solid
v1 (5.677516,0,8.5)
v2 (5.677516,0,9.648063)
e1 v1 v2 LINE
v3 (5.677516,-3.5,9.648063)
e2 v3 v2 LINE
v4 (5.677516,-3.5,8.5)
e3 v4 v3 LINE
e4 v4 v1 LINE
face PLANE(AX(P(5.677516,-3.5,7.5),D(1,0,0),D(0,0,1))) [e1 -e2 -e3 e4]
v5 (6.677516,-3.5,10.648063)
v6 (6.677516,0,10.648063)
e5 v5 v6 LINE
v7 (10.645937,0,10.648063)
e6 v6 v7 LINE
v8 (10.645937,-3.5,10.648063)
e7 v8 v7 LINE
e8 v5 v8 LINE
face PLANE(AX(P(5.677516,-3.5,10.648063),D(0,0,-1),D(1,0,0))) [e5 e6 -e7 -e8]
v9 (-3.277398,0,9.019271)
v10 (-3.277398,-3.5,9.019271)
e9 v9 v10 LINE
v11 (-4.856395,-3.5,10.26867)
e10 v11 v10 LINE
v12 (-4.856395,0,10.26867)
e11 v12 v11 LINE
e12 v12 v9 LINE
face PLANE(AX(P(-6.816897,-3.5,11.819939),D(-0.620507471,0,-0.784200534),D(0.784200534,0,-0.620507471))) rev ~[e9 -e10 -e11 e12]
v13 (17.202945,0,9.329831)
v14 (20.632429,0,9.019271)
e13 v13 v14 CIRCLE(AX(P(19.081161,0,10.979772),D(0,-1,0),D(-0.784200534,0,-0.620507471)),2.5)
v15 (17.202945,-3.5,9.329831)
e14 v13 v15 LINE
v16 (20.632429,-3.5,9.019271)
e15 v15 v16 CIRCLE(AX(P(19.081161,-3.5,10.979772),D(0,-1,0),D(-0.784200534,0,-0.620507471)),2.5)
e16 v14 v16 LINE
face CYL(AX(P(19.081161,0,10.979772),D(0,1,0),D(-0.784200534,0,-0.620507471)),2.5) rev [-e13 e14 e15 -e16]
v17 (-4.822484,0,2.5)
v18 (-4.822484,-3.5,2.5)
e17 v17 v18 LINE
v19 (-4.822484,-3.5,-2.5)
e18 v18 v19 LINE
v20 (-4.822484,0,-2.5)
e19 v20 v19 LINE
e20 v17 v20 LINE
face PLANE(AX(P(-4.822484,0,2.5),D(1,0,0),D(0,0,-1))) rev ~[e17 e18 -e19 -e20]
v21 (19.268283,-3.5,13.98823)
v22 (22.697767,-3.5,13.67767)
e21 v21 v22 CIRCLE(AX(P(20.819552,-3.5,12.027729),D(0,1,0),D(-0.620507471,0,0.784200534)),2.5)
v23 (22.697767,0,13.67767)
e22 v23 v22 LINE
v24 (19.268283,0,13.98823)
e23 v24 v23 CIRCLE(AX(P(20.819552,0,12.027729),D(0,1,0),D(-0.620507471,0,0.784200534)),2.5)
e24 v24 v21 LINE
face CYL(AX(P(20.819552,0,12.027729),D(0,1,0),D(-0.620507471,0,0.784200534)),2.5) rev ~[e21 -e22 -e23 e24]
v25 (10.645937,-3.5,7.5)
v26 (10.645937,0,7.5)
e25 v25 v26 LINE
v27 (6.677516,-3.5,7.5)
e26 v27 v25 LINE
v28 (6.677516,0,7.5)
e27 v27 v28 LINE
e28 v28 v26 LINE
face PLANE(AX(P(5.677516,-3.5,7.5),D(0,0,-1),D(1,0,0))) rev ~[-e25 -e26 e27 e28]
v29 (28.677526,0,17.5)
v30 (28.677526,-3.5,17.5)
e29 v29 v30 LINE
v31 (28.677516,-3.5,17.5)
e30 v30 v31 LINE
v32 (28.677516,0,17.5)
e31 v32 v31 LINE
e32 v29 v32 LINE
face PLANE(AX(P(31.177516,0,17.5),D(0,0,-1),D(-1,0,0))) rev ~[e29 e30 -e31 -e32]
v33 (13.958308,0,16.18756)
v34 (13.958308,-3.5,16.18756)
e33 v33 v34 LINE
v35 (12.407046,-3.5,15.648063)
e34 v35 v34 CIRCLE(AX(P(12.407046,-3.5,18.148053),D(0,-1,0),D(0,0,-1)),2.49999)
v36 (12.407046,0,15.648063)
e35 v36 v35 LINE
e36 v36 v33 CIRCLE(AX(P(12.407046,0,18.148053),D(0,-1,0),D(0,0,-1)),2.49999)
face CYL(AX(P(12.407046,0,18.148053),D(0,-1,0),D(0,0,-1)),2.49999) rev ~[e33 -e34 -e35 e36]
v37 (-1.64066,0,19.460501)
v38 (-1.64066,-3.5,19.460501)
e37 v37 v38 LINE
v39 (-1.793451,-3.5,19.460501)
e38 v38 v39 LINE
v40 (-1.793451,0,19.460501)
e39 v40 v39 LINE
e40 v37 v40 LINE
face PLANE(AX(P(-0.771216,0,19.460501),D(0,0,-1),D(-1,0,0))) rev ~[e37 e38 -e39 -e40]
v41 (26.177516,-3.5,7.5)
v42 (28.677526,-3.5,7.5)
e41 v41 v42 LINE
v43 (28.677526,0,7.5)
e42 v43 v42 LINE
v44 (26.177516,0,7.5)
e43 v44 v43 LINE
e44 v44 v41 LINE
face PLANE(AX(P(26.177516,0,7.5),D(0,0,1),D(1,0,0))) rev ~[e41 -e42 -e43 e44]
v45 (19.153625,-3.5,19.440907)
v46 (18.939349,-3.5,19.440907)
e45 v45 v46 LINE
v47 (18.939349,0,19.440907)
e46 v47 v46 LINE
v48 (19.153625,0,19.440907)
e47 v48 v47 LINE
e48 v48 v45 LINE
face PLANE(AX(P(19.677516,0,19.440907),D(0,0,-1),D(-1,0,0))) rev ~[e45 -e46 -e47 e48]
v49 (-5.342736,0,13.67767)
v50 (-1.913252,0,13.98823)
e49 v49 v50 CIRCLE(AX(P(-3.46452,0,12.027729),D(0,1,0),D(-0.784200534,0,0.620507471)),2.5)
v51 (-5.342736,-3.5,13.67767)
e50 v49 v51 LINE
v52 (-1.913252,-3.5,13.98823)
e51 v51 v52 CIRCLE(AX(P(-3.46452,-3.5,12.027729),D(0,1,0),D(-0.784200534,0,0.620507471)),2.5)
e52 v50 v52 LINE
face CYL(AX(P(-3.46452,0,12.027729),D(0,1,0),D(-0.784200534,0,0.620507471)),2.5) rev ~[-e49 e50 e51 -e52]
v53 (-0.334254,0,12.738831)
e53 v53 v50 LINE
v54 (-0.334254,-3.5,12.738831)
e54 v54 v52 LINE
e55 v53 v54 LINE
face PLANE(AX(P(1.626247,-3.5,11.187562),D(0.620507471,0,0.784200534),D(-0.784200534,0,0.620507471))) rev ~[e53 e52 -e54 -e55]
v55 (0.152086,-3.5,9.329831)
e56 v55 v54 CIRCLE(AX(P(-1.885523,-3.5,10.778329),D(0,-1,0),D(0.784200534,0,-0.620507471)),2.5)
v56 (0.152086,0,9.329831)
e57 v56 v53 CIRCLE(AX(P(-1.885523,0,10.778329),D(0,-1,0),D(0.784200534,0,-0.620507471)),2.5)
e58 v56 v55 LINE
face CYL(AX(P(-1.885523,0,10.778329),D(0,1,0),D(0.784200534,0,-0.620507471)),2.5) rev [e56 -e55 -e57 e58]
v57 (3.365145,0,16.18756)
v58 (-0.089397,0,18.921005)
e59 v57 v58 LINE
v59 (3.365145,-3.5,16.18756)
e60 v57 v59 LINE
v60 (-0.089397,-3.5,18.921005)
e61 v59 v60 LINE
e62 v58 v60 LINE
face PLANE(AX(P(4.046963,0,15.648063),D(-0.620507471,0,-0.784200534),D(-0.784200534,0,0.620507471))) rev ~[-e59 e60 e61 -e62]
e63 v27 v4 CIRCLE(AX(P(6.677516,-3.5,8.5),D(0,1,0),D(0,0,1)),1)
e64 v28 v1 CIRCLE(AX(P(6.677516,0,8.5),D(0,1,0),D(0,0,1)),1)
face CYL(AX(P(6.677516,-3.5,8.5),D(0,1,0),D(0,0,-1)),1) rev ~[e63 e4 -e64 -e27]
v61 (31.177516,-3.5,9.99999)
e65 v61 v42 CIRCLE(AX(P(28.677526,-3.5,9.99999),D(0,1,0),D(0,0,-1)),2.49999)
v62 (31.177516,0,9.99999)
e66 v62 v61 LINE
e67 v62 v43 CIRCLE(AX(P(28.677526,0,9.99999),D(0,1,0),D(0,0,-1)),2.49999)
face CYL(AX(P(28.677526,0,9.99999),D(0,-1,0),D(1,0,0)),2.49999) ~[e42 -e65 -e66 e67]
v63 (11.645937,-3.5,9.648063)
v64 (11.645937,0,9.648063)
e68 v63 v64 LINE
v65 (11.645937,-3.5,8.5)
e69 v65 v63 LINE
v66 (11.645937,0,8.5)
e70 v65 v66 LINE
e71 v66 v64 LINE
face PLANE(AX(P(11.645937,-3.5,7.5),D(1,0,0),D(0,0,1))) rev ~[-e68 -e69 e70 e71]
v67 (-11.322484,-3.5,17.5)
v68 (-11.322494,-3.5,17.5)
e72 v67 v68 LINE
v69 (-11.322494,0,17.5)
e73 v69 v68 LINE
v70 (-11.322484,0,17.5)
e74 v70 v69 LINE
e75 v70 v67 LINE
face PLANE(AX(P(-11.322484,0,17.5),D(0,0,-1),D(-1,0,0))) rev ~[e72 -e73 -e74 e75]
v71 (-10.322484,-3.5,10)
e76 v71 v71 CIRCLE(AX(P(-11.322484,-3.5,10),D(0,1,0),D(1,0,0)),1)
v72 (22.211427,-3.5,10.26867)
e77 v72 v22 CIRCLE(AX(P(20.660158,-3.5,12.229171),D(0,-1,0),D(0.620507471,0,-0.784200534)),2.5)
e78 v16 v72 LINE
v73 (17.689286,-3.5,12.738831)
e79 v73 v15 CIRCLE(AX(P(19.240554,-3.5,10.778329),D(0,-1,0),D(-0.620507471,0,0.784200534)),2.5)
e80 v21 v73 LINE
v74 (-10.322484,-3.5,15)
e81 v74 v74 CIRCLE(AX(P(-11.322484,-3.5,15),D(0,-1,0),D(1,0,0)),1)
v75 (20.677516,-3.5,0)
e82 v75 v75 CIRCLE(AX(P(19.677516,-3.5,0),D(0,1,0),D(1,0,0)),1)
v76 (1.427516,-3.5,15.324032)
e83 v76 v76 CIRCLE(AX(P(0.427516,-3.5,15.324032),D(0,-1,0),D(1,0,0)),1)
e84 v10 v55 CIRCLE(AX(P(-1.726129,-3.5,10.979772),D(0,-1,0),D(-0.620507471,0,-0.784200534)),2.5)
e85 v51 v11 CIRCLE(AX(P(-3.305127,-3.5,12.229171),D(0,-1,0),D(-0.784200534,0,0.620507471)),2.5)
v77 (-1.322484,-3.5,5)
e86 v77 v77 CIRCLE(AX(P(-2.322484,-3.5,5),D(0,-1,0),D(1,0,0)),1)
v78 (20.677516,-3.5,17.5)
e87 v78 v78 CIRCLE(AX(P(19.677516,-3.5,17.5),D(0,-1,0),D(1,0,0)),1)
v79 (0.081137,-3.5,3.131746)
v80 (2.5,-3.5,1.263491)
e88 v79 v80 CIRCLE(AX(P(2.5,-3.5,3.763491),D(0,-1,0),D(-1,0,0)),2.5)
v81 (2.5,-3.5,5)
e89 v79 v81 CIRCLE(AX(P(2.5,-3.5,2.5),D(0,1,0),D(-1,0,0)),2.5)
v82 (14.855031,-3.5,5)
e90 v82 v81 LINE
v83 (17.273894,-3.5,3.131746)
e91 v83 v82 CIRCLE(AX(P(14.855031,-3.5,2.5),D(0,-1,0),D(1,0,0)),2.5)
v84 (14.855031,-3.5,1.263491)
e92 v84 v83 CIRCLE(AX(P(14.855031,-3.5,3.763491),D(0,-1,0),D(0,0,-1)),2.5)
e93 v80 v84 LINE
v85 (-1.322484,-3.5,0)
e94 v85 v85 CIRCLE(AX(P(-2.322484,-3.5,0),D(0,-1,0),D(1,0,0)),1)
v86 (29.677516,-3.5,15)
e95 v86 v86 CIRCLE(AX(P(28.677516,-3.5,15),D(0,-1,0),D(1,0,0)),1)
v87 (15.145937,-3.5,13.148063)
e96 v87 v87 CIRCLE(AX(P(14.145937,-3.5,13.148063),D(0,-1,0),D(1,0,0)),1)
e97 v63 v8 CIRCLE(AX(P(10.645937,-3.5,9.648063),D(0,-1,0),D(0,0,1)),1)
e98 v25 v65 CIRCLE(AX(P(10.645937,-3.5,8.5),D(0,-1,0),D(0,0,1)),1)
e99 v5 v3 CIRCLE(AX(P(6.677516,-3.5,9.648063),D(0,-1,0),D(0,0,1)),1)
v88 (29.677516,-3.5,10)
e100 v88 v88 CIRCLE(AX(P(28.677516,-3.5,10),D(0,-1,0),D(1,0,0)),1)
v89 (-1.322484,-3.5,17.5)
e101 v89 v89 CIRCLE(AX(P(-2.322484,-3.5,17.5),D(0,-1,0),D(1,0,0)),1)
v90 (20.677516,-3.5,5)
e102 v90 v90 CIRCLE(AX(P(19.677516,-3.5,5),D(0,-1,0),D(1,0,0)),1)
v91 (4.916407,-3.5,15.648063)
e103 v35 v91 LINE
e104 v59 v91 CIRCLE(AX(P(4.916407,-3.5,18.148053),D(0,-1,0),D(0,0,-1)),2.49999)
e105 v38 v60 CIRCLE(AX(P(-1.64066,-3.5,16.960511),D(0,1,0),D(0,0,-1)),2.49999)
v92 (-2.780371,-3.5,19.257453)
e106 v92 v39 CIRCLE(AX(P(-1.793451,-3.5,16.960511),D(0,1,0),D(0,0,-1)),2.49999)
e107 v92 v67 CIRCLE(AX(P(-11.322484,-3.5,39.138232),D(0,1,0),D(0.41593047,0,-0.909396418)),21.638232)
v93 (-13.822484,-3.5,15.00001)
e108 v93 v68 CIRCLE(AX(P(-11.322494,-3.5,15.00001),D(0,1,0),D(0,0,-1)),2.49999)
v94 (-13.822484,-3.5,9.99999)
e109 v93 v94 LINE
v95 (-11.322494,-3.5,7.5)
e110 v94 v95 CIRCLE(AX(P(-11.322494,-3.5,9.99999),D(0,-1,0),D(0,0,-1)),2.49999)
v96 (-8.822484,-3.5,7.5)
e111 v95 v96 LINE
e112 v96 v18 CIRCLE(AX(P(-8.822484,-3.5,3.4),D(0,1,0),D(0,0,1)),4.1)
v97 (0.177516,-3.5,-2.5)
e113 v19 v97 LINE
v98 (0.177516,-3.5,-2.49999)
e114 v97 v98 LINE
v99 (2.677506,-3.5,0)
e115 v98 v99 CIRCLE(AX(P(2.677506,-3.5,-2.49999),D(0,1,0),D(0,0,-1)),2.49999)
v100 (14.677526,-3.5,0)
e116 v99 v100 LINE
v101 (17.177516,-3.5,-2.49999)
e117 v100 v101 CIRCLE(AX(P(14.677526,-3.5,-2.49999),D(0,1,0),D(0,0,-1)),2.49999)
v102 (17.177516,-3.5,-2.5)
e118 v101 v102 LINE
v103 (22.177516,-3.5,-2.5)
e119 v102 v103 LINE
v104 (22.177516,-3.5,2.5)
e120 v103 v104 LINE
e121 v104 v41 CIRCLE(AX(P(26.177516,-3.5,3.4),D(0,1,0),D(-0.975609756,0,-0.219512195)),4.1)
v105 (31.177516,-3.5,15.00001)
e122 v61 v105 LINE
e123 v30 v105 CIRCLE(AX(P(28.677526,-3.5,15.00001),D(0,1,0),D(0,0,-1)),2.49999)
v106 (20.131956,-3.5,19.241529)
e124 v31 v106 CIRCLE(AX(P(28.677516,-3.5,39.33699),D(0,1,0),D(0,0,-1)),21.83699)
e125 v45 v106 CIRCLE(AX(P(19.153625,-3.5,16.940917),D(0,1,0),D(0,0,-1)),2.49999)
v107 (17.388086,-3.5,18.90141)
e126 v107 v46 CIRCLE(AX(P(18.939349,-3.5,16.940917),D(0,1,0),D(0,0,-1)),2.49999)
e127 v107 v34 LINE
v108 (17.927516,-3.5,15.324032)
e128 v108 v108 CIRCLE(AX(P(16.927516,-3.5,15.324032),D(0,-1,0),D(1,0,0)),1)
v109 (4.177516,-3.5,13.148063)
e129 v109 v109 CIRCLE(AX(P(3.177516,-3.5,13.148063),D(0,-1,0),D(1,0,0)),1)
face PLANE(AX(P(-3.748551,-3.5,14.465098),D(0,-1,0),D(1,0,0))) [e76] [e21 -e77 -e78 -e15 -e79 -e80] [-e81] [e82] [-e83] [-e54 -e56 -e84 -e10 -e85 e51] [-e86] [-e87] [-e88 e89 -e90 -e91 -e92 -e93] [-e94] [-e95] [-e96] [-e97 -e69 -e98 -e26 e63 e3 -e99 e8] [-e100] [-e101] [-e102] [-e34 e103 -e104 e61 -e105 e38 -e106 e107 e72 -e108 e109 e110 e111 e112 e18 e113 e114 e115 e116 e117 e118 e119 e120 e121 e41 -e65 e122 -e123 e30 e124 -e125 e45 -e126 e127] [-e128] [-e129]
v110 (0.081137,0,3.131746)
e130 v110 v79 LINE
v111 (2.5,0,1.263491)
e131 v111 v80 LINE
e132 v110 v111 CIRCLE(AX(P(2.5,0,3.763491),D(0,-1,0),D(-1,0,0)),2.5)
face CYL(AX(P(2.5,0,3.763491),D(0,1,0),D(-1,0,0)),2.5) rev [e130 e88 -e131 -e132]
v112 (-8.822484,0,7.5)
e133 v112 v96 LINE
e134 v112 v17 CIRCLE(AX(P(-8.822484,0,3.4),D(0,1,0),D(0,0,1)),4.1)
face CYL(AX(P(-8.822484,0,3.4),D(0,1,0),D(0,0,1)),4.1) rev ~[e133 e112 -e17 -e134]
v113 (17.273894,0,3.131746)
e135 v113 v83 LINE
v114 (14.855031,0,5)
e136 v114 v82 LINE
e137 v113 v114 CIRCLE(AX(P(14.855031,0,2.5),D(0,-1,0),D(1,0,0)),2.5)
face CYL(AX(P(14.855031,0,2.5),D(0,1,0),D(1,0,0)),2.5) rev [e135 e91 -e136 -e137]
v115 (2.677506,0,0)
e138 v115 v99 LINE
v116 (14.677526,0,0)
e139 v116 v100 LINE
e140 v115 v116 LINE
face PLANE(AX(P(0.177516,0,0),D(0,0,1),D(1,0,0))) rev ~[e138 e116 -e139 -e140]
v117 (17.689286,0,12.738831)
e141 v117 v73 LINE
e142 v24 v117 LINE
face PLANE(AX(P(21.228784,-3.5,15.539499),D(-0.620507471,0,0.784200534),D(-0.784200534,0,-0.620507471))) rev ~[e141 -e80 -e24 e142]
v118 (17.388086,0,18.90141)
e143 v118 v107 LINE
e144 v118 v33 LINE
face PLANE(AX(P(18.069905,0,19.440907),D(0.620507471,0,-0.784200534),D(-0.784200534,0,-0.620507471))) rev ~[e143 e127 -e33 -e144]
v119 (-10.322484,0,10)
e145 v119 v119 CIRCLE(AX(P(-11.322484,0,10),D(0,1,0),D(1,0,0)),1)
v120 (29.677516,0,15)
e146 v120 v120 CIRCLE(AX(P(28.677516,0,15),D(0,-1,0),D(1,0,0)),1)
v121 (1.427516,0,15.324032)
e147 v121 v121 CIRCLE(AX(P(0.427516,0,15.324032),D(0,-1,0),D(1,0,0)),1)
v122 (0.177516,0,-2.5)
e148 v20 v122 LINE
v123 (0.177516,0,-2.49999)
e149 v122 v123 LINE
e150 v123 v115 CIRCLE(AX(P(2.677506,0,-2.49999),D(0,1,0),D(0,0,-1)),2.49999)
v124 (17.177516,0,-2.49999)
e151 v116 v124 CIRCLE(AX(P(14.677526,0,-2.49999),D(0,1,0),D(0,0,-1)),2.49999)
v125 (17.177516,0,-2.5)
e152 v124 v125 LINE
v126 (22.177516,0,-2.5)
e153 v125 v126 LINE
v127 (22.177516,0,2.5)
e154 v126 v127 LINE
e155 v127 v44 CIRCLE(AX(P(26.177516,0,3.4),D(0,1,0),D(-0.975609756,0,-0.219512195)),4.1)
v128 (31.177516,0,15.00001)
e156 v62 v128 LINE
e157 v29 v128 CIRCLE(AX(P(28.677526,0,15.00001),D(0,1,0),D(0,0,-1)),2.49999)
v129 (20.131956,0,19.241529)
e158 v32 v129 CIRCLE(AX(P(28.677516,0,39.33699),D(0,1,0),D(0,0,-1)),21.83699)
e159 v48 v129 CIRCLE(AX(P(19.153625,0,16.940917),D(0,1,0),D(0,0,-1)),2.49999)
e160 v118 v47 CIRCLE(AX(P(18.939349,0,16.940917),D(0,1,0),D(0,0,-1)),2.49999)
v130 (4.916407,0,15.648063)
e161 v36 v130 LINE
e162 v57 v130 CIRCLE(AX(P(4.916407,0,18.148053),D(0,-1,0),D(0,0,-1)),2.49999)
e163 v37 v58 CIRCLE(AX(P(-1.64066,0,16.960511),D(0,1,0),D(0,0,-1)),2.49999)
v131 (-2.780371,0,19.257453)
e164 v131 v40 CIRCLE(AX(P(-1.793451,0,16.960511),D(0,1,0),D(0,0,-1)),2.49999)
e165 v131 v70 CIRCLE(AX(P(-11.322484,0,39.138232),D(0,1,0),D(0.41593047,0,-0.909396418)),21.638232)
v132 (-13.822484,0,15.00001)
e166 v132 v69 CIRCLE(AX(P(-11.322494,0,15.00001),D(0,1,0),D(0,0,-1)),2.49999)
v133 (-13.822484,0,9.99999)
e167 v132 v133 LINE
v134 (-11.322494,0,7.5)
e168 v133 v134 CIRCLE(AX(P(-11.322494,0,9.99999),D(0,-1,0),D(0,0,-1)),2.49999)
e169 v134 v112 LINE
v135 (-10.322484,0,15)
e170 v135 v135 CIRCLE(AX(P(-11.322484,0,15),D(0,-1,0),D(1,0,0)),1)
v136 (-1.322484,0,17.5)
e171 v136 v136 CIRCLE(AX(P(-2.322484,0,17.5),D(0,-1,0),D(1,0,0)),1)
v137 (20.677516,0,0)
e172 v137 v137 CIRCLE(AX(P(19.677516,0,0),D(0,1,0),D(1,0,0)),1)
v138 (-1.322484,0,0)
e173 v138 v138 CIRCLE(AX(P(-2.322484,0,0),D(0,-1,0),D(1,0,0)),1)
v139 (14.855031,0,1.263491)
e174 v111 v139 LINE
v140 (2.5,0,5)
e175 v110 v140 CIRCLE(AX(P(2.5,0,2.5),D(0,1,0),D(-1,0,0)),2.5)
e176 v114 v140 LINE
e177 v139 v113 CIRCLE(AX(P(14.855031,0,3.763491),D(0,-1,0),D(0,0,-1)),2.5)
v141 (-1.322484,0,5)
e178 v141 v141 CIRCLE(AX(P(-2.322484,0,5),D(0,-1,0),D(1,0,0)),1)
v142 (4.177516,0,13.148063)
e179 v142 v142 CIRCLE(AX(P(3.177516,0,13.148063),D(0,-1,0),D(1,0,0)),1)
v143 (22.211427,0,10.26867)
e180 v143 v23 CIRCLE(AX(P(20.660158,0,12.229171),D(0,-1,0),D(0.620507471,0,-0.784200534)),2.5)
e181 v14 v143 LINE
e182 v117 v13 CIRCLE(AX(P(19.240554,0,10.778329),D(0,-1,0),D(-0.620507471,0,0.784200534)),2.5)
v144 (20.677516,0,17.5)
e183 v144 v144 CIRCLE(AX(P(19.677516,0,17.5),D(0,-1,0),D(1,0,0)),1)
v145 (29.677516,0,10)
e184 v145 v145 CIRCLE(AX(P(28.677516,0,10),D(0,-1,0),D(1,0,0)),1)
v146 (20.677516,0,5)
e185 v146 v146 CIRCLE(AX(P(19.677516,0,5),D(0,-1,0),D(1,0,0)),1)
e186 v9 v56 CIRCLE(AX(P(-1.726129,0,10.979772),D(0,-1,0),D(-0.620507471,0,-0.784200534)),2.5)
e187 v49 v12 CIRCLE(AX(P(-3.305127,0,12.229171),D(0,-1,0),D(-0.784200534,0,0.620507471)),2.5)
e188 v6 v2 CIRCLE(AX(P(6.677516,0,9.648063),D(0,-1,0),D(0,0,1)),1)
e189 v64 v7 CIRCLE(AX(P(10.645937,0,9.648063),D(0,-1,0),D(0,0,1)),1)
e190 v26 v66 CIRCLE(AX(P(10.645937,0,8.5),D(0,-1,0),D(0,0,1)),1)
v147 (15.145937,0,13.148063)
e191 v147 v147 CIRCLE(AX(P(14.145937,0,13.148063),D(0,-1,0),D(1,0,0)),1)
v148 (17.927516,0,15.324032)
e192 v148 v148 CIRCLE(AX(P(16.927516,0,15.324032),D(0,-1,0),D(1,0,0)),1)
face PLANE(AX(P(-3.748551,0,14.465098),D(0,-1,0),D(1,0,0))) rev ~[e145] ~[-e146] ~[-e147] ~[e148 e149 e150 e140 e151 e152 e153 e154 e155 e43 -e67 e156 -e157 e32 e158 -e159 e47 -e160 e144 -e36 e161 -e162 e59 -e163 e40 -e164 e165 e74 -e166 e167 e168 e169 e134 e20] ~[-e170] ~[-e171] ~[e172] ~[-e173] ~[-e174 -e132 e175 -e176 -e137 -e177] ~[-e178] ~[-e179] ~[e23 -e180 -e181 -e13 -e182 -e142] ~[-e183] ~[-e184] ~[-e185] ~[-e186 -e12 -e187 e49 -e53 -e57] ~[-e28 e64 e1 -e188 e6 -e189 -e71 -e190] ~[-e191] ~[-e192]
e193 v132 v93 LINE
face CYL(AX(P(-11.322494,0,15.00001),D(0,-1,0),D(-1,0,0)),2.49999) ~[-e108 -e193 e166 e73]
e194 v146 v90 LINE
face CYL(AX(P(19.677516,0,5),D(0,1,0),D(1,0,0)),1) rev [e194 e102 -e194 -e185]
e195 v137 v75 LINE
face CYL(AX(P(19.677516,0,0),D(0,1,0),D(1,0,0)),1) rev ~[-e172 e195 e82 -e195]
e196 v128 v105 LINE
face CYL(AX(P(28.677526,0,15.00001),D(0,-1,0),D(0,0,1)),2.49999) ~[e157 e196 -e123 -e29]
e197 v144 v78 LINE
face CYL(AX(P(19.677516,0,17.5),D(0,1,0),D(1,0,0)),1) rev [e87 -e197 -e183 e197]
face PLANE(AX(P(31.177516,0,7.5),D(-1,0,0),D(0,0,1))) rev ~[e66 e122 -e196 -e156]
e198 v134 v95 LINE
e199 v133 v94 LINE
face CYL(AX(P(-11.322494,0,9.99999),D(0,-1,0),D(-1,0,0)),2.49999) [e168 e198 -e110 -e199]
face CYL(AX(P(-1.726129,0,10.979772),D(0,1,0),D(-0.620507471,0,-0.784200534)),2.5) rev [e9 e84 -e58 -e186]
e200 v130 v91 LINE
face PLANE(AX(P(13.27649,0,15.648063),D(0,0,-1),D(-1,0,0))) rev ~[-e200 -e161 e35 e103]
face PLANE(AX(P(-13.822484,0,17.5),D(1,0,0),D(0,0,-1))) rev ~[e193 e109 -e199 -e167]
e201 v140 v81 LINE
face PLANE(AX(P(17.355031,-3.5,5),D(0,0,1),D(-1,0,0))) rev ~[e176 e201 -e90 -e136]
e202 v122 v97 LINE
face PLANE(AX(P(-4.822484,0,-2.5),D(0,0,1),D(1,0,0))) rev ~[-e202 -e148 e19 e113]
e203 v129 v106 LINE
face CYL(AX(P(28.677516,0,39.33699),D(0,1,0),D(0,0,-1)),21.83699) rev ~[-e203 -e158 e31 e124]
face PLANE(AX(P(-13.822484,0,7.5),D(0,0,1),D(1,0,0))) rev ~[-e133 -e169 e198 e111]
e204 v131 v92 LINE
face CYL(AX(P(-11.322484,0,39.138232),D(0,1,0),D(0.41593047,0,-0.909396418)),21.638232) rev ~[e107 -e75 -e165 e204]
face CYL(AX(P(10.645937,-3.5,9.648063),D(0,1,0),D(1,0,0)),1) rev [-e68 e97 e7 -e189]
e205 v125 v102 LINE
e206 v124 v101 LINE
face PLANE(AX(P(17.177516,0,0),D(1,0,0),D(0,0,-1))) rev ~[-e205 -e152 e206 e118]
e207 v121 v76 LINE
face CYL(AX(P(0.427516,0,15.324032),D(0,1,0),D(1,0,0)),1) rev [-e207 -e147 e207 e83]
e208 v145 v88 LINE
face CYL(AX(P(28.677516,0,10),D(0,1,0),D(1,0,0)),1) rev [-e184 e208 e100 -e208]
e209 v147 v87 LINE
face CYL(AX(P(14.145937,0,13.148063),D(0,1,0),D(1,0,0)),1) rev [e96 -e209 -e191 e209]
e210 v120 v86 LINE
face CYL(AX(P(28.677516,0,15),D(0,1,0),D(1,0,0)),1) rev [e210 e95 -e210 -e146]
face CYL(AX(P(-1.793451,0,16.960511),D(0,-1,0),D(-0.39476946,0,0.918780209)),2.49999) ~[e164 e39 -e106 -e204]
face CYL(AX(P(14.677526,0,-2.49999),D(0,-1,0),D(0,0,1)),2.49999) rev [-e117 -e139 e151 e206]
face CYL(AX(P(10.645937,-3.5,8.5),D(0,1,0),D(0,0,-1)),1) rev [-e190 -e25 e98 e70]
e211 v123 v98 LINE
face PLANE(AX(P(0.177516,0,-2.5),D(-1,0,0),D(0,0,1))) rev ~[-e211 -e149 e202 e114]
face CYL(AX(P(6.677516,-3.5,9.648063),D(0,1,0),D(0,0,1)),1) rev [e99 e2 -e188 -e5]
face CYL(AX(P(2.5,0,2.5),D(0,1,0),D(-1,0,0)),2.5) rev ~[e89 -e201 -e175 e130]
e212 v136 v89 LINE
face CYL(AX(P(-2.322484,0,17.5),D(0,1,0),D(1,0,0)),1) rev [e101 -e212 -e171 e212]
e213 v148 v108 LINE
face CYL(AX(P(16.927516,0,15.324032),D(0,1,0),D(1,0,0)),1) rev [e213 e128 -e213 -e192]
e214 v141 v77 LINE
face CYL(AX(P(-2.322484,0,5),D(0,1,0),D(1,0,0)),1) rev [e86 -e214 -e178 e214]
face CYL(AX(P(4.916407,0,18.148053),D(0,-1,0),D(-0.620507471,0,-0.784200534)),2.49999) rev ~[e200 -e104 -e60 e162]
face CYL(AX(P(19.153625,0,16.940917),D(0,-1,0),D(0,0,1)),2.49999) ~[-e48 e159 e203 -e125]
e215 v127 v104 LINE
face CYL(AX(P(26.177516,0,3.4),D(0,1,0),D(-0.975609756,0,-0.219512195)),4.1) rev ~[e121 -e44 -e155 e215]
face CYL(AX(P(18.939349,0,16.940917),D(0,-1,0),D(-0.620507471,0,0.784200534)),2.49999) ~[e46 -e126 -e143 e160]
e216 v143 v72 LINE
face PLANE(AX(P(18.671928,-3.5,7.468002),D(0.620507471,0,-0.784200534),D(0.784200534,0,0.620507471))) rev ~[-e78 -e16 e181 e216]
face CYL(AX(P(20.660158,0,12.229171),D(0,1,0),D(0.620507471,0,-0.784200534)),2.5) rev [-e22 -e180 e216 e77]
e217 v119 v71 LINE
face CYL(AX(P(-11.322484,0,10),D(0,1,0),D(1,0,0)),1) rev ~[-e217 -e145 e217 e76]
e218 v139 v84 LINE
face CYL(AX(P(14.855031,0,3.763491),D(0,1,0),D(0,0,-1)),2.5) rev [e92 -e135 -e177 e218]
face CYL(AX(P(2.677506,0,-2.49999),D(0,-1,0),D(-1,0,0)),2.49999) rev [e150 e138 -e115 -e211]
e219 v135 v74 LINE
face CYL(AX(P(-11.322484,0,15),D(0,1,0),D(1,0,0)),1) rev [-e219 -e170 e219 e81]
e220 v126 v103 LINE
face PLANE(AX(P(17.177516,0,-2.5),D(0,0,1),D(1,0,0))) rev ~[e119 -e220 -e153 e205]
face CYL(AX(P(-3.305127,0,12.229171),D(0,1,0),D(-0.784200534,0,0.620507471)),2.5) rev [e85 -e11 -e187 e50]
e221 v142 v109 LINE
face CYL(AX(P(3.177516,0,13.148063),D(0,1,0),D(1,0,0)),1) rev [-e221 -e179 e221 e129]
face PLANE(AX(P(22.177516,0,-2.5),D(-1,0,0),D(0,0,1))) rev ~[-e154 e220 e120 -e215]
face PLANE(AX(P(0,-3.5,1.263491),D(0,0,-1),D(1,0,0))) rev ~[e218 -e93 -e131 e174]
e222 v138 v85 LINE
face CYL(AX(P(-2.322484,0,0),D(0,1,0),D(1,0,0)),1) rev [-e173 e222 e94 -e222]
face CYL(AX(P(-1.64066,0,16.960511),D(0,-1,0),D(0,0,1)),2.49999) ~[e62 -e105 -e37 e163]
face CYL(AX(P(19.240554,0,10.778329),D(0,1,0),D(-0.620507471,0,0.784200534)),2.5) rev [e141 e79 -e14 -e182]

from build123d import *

# Parameters (mm, degrees)
F0_R        = 1
F1_DEPTH    = 3.5
F2_R        = 2.49999
F3_W        = 8.6775156483
F3_H        = 3.7365088891
F4_DEPTH    = 25.4
F5_T1_DEPTH = 3.5
F6_W        = 5.9684215951
F6_H        = 3.1480632909
F7_DEPTH    = 25.4
F8_R        = 1


# Not quite as in the source:
# - a fillet or chamfer that OpenCascade refuses, or shapes differently, is made with other operations: its cross-section is extruded or revolved along the edge and cut away or added
# - a fillet or chamfer is up to 0.001 mm smaller than in the source, because OpenCascade refuses the exact size


with BuildPart() as f1:
    # F0 (on Front) → F1 (new body)
    with BuildSketch(Plane.XZ):
        with BuildLine():
            Line((-13.8224843517, 17.5), (-13.8224843517, 10))
            Line((-13.8224843517, 10), (-13.8224843517, 7.5))
            Line((-13.8224843517, 7.5), (-8.8224843517, 7.5))
            ThreePointArc((-8.8224843517, 7.5), (-5.620922233, 5.961249695), (-4.8224843517, 2.5))
            Line((-4.8224843517, 2.5), (-4.8224843517, 0))
            Line((-4.8224843517, 0), (-4.8224843517, -2.5))
            Line((-4.8224843517, -2.5), (0.1775156483, -2.5))
            Line((0.1775156483, -2.5), (0.1775156483, 0))
            Line((0.1775156483, 0), (8.6775156483, 0))
            Line((8.6775156483, 0), (17.1775156483, 0))
            Line((17.1775156483, 0), (17.1775156483, -2.5))
            Line((17.1775156483, -2.5), (22.1775156483, -2.5))
            Line((22.1775156483, -2.5), (22.1775156483, 0))
            Line((22.1775156483, 0), (22.1775156483, 2.5))
            ThreePointArc((22.1775156483, 2.5), (22.9759535296, 5.961249695), (26.1775156483, 7.5))
            Line((26.1775156483, 7.5), (31.1775156483, 7.5))
            Line((31.1775156483, 7.5), (31.1775156483, 10))
            Line((31.1775156483, 10), (31.1775156483, 17.5))
            Line((31.1775156483, 17.5), (28.6775156483, 17.5))
            ThreePointArc((28.6775156483, 17.5), (24.0740626287, 17.9907408644), (19.6775156483, 19.4409066995))
            Line((19.6775156483, 19.4409066995), (18.069904763, 19.4409066995))
            Line((18.069904763, 19.4409066995), (13.2764897522, 15.6480632909))
            Line((13.2764897522, 15.6480632909), (4.0469631395, 15.6480632909))
            Line((4.0469631395, 15.6480632909), (-0.7712156733, 19.4605013357))
            Line((-0.7712156733, 19.4605013357), (-2.3224843517, 19.4605013357))
            ThreePointArc((-2.3224843517, 19.4605013357), (-6.7169560029, 17.9958056322), (-11.3224843517, 17.5))
            Line((-11.3224843517, 17.5), (-13.8224843517, 17.5))
        make_face()
        with Locations((-2.3224843517, 0)):
            Circle(F0_R, mode=Mode.SUBTRACT)
        with Locations((-2.3224843517, 5)):
            Circle(F0_R, mode=Mode.SUBTRACT)
        with BuildLine():
            ThreePointArc((18.6775156483, 0), (19.6775156483, 1), (20.6775156483, 0))
            ThreePointArc((20.6775156483, 0), (19.6775156483, -1), (18.6775156483, 0))
        make_face(mode=Mode.SUBTRACT)
        with Locations((19.6775156483, 5)):
            Circle(F0_R, mode=Mode.SUBTRACT)
        with BuildLine():
            ThreePointArc((-12.3224843517, 10), (-11.3224843517, 11), (-10.3224843517, 10))
            ThreePointArc((-10.3224843517, 10), (-11.3224843517, 9), (-12.3224843517, 10))
        make_face(mode=Mode.SUBTRACT)
        with Locations((3.1775156483, 13.1480632909)):
            Circle(F0_R, mode=Mode.SUBTRACT)
        with Locations((-11.3224843517, 15)):
            Circle(F0_R, mode=Mode.SUBTRACT)
        with Locations((0.4275156483, 15.3240316454)):
            Circle(F0_R, mode=Mode.SUBTRACT)
        with Locations((-2.3224843517, 17.5)):
            Circle(F0_R, mode=Mode.SUBTRACT)
        with Locations((14.1459372434, 13.1480632909)):
            Circle(F0_R, mode=Mode.SUBTRACT)
        with Locations((28.6775156483, 10)):
            Circle(F0_R, mode=Mode.SUBTRACT)
        with Locations((16.9275156483, 15.3240316454)):
            Circle(F0_R, mode=Mode.SUBTRACT)
        with Locations((19.6775156483, 17.5)):
            Circle(F0_R, mode=Mode.SUBTRACT)
        with Locations((28.6775156483, 15)):
            Circle(F0_R, mode=Mode.SUBTRACT)
    extrude(amount=F1_DEPTH)

    # F2 (radius 2.5 in the source; OpenCascade refuses exactly that, so slightly less here)
    f2_edges = [f1.edges().sort_by_distance(p)[0] for p in [
        (-13.822484, -1.75, 17.5),
        (-13.822484, -1.75, 7.5),
        (31.177516, -1.75, 7.5),
        (31.177516, -1.75, 17.5),
        (-2.322484, -1.75, 19.460501),
        (-0.771216, -1.75, 19.460501),
        (4.046963, -1.75, 15.648063),
        (13.27649, -1.75, 15.648063),
        (18.069905, -1.75, 19.440907),
        (19.677516, -1.75, 19.440907),
        (0.177516, -1.75, 0),
        (17.177516, -1.75, 0),
    ]]
    fillet(f2_edges, radius=F2_R)

    # F3 (on face) → F4 (cut)
    with BuildSketch(Plane.XZ.offset(3.5)):
        Polygon((1.6262469699, 11.1875619551), (-3.8737530301, 15.5394986643), (-6.8168965969, 11.8199386845), (-1.3168965969, 7.4680019754), align=None)
        with Locations((4.3387578242, 3.1317455554)):
            Rectangle(F3_W, F3_H)
        with Locations((13.0162734725, 3.1317455554)):
            Rectangle(F3_W, F3_H)
        Polygon((24.1719278936, 11.8199386845), (21.2287843267, 15.5394986643), (15.7287843267, 11.1875619551), (18.6719278936, 7.4680019754), align=None)
    extrude(amount=-F4_DEPTH, mode=Mode.SUBTRACT)

    # F5: fillet of radius 2.5 on 12 edges, made by hand

    # F5_s2 → F5_t1 (join)
    with BuildSketch(Plane.XZ):
        with BuildLine():
            ThreePointArc((-5.4250217085, 13.5789973285), (-3.7538915599, 14.5109250411), (-1.9132516944, 13.9882299859))
            Line((-1.9132516944, 13.9882299859), (-3.8737530301, 15.5394986643))
            Line((-3.8737530301, 15.5394986643), (-5.4250217085, 13.5789973285))
        make_face()
        with BuildLine():
            ThreePointArc((-5.2656279185, 13.7804400203), (-5.7883229738, 11.9398001548), (-4.8563952612, 10.2686700061))
            Line((-4.8563952612, 10.2686700061), (-6.8168965969, 11.8199386845))
            Line((-6.8168965969, 11.8199386845), (-5.2656279185, 13.7804400203))
        make_face()
        with BuildLine():
            ThreePointArc((-3.2773979327, 9.0192706538), (-1.4367580672, 8.4965755986), (0.2343720815, 9.4285033111))
            Line((0.2343720815, 9.4285033111), (-1.3168965969, 7.4680019754))
            Line((-1.3168965969, 7.4680019754), (-3.2773979327, 9.0192706538))
        make_face()
        with BuildLine():
            ThreePointArc((0.0749782915, 9.2270606194), (0.5976733467, 11.0677004849), (-0.3342543658, 12.7388306335))
            Line((-0.3342543658, 12.7388306335), (1.6262469699, 11.1875619551))
            Line((1.6262469699, 11.1875619551), (0.0749782915, 9.2270606194))
        make_face()
        with BuildLine():
            ThreePointArc((22.2114265578, 10.2686700061), (23.1433542704, 11.9398001548), (22.6206592151, 13.7804400203))
            Line((22.6206592151, 13.7804400203), (24.1719278936, 11.8199386845))
            Line((24.1719278936, 11.8199386845), (22.2114265578, 10.2686700061))
        make_face()
        with BuildLine():
            ThreePointArc((19.268282991, 13.9882299859), (21.1089228565, 14.5109250411), (22.7800530051, 13.5789973285))
            Line((22.7800530051, 13.5789973285), (21.2287843267, 15.5394986643))
            Line((21.2287843267, 15.5394986643), (19.268282991, 13.9882299859))
        make_face()
        with BuildLine():
            ThreePointArc((17.6892856624, 12.7388306335), (16.7573579499, 11.0677004849), (17.2800530051, 9.2270606194))
            Line((17.2800530051, 9.2270606194), (15.7287843267, 11.1875619551))
            Line((15.7287843267, 11.1875619551), (17.6892856624, 12.7388306335))
        make_face()
        with BuildLine():
            ThreePointArc((17.1206592151, 9.4285033111), (18.7917893638, 8.4965755986), (20.6324292293, 9.0192706538))
            Line((20.6324292293, 9.0192706538), (18.6719278936, 7.4680019754))
            Line((18.6719278936, 7.4680019754), (17.1206592151, 9.4285033111))
        make_face()
        with BuildLine():
            ThreePointArc((0, 3.7634911109), (0.732233047, 1.9957241579), (2.5, 1.2634911109))
            Line((2.5, 1.2634911109), (0, 1.2634911109))
            Line((0, 1.2634911109), (0, 3.7634911109))
        make_face()
        with BuildLine():
            ThreePointArc((0, 2.5), (0.732233047, 4.267766953), (2.5, 5))
            Line((2.5, 5), (0, 5))
            Line((0, 5), (0, 2.5))
        make_face()
        with BuildLine():
            ThreePointArc((17.3550312966, 2.5), (16.6227982496, 4.267766953), (14.8550312966, 5))
            Line((14.8550312966, 5), (17.3550312966, 5))
            Line((17.3550312966, 5), (17.3550312966, 2.5))
        make_face()
        with BuildLine():
            ThreePointArc((14.8550312966, 1.2634911109), (16.6227982496, 1.9957241579), (17.3550312966, 3.7634911109))
            Line((17.3550312966, 3.7634911109), (17.3550312966, 1.2634911109))
            Line((17.3550312966, 1.2634911109), (14.8550312966, 1.2634911109))
        make_face()
    extrude(amount=F5_T1_DEPTH)

    # F6 (on face) → F7 (cut)
    with BuildSketch(Plane.XZ.offset(3.5)):
        with Locations((8.6617264459, 9.0740316454)):
            Rectangle(F6_W, F6_H)
    extrude(amount=-F7_DEPTH, mode=Mode.SUBTRACT)

    # F8
    f8_edges = [f1.edges().sort_by_distance(p)[0] for p in [
        (5.677516, -1.75, 7.5),
        (5.677516, -1.75, 10.648063),
        (11.645937, -1.75, 7.5),
        (11.645937, -1.75, 10.648063),
    ]]
    fillet(f8_edges, radius=F8_R)


solid = f1.part
